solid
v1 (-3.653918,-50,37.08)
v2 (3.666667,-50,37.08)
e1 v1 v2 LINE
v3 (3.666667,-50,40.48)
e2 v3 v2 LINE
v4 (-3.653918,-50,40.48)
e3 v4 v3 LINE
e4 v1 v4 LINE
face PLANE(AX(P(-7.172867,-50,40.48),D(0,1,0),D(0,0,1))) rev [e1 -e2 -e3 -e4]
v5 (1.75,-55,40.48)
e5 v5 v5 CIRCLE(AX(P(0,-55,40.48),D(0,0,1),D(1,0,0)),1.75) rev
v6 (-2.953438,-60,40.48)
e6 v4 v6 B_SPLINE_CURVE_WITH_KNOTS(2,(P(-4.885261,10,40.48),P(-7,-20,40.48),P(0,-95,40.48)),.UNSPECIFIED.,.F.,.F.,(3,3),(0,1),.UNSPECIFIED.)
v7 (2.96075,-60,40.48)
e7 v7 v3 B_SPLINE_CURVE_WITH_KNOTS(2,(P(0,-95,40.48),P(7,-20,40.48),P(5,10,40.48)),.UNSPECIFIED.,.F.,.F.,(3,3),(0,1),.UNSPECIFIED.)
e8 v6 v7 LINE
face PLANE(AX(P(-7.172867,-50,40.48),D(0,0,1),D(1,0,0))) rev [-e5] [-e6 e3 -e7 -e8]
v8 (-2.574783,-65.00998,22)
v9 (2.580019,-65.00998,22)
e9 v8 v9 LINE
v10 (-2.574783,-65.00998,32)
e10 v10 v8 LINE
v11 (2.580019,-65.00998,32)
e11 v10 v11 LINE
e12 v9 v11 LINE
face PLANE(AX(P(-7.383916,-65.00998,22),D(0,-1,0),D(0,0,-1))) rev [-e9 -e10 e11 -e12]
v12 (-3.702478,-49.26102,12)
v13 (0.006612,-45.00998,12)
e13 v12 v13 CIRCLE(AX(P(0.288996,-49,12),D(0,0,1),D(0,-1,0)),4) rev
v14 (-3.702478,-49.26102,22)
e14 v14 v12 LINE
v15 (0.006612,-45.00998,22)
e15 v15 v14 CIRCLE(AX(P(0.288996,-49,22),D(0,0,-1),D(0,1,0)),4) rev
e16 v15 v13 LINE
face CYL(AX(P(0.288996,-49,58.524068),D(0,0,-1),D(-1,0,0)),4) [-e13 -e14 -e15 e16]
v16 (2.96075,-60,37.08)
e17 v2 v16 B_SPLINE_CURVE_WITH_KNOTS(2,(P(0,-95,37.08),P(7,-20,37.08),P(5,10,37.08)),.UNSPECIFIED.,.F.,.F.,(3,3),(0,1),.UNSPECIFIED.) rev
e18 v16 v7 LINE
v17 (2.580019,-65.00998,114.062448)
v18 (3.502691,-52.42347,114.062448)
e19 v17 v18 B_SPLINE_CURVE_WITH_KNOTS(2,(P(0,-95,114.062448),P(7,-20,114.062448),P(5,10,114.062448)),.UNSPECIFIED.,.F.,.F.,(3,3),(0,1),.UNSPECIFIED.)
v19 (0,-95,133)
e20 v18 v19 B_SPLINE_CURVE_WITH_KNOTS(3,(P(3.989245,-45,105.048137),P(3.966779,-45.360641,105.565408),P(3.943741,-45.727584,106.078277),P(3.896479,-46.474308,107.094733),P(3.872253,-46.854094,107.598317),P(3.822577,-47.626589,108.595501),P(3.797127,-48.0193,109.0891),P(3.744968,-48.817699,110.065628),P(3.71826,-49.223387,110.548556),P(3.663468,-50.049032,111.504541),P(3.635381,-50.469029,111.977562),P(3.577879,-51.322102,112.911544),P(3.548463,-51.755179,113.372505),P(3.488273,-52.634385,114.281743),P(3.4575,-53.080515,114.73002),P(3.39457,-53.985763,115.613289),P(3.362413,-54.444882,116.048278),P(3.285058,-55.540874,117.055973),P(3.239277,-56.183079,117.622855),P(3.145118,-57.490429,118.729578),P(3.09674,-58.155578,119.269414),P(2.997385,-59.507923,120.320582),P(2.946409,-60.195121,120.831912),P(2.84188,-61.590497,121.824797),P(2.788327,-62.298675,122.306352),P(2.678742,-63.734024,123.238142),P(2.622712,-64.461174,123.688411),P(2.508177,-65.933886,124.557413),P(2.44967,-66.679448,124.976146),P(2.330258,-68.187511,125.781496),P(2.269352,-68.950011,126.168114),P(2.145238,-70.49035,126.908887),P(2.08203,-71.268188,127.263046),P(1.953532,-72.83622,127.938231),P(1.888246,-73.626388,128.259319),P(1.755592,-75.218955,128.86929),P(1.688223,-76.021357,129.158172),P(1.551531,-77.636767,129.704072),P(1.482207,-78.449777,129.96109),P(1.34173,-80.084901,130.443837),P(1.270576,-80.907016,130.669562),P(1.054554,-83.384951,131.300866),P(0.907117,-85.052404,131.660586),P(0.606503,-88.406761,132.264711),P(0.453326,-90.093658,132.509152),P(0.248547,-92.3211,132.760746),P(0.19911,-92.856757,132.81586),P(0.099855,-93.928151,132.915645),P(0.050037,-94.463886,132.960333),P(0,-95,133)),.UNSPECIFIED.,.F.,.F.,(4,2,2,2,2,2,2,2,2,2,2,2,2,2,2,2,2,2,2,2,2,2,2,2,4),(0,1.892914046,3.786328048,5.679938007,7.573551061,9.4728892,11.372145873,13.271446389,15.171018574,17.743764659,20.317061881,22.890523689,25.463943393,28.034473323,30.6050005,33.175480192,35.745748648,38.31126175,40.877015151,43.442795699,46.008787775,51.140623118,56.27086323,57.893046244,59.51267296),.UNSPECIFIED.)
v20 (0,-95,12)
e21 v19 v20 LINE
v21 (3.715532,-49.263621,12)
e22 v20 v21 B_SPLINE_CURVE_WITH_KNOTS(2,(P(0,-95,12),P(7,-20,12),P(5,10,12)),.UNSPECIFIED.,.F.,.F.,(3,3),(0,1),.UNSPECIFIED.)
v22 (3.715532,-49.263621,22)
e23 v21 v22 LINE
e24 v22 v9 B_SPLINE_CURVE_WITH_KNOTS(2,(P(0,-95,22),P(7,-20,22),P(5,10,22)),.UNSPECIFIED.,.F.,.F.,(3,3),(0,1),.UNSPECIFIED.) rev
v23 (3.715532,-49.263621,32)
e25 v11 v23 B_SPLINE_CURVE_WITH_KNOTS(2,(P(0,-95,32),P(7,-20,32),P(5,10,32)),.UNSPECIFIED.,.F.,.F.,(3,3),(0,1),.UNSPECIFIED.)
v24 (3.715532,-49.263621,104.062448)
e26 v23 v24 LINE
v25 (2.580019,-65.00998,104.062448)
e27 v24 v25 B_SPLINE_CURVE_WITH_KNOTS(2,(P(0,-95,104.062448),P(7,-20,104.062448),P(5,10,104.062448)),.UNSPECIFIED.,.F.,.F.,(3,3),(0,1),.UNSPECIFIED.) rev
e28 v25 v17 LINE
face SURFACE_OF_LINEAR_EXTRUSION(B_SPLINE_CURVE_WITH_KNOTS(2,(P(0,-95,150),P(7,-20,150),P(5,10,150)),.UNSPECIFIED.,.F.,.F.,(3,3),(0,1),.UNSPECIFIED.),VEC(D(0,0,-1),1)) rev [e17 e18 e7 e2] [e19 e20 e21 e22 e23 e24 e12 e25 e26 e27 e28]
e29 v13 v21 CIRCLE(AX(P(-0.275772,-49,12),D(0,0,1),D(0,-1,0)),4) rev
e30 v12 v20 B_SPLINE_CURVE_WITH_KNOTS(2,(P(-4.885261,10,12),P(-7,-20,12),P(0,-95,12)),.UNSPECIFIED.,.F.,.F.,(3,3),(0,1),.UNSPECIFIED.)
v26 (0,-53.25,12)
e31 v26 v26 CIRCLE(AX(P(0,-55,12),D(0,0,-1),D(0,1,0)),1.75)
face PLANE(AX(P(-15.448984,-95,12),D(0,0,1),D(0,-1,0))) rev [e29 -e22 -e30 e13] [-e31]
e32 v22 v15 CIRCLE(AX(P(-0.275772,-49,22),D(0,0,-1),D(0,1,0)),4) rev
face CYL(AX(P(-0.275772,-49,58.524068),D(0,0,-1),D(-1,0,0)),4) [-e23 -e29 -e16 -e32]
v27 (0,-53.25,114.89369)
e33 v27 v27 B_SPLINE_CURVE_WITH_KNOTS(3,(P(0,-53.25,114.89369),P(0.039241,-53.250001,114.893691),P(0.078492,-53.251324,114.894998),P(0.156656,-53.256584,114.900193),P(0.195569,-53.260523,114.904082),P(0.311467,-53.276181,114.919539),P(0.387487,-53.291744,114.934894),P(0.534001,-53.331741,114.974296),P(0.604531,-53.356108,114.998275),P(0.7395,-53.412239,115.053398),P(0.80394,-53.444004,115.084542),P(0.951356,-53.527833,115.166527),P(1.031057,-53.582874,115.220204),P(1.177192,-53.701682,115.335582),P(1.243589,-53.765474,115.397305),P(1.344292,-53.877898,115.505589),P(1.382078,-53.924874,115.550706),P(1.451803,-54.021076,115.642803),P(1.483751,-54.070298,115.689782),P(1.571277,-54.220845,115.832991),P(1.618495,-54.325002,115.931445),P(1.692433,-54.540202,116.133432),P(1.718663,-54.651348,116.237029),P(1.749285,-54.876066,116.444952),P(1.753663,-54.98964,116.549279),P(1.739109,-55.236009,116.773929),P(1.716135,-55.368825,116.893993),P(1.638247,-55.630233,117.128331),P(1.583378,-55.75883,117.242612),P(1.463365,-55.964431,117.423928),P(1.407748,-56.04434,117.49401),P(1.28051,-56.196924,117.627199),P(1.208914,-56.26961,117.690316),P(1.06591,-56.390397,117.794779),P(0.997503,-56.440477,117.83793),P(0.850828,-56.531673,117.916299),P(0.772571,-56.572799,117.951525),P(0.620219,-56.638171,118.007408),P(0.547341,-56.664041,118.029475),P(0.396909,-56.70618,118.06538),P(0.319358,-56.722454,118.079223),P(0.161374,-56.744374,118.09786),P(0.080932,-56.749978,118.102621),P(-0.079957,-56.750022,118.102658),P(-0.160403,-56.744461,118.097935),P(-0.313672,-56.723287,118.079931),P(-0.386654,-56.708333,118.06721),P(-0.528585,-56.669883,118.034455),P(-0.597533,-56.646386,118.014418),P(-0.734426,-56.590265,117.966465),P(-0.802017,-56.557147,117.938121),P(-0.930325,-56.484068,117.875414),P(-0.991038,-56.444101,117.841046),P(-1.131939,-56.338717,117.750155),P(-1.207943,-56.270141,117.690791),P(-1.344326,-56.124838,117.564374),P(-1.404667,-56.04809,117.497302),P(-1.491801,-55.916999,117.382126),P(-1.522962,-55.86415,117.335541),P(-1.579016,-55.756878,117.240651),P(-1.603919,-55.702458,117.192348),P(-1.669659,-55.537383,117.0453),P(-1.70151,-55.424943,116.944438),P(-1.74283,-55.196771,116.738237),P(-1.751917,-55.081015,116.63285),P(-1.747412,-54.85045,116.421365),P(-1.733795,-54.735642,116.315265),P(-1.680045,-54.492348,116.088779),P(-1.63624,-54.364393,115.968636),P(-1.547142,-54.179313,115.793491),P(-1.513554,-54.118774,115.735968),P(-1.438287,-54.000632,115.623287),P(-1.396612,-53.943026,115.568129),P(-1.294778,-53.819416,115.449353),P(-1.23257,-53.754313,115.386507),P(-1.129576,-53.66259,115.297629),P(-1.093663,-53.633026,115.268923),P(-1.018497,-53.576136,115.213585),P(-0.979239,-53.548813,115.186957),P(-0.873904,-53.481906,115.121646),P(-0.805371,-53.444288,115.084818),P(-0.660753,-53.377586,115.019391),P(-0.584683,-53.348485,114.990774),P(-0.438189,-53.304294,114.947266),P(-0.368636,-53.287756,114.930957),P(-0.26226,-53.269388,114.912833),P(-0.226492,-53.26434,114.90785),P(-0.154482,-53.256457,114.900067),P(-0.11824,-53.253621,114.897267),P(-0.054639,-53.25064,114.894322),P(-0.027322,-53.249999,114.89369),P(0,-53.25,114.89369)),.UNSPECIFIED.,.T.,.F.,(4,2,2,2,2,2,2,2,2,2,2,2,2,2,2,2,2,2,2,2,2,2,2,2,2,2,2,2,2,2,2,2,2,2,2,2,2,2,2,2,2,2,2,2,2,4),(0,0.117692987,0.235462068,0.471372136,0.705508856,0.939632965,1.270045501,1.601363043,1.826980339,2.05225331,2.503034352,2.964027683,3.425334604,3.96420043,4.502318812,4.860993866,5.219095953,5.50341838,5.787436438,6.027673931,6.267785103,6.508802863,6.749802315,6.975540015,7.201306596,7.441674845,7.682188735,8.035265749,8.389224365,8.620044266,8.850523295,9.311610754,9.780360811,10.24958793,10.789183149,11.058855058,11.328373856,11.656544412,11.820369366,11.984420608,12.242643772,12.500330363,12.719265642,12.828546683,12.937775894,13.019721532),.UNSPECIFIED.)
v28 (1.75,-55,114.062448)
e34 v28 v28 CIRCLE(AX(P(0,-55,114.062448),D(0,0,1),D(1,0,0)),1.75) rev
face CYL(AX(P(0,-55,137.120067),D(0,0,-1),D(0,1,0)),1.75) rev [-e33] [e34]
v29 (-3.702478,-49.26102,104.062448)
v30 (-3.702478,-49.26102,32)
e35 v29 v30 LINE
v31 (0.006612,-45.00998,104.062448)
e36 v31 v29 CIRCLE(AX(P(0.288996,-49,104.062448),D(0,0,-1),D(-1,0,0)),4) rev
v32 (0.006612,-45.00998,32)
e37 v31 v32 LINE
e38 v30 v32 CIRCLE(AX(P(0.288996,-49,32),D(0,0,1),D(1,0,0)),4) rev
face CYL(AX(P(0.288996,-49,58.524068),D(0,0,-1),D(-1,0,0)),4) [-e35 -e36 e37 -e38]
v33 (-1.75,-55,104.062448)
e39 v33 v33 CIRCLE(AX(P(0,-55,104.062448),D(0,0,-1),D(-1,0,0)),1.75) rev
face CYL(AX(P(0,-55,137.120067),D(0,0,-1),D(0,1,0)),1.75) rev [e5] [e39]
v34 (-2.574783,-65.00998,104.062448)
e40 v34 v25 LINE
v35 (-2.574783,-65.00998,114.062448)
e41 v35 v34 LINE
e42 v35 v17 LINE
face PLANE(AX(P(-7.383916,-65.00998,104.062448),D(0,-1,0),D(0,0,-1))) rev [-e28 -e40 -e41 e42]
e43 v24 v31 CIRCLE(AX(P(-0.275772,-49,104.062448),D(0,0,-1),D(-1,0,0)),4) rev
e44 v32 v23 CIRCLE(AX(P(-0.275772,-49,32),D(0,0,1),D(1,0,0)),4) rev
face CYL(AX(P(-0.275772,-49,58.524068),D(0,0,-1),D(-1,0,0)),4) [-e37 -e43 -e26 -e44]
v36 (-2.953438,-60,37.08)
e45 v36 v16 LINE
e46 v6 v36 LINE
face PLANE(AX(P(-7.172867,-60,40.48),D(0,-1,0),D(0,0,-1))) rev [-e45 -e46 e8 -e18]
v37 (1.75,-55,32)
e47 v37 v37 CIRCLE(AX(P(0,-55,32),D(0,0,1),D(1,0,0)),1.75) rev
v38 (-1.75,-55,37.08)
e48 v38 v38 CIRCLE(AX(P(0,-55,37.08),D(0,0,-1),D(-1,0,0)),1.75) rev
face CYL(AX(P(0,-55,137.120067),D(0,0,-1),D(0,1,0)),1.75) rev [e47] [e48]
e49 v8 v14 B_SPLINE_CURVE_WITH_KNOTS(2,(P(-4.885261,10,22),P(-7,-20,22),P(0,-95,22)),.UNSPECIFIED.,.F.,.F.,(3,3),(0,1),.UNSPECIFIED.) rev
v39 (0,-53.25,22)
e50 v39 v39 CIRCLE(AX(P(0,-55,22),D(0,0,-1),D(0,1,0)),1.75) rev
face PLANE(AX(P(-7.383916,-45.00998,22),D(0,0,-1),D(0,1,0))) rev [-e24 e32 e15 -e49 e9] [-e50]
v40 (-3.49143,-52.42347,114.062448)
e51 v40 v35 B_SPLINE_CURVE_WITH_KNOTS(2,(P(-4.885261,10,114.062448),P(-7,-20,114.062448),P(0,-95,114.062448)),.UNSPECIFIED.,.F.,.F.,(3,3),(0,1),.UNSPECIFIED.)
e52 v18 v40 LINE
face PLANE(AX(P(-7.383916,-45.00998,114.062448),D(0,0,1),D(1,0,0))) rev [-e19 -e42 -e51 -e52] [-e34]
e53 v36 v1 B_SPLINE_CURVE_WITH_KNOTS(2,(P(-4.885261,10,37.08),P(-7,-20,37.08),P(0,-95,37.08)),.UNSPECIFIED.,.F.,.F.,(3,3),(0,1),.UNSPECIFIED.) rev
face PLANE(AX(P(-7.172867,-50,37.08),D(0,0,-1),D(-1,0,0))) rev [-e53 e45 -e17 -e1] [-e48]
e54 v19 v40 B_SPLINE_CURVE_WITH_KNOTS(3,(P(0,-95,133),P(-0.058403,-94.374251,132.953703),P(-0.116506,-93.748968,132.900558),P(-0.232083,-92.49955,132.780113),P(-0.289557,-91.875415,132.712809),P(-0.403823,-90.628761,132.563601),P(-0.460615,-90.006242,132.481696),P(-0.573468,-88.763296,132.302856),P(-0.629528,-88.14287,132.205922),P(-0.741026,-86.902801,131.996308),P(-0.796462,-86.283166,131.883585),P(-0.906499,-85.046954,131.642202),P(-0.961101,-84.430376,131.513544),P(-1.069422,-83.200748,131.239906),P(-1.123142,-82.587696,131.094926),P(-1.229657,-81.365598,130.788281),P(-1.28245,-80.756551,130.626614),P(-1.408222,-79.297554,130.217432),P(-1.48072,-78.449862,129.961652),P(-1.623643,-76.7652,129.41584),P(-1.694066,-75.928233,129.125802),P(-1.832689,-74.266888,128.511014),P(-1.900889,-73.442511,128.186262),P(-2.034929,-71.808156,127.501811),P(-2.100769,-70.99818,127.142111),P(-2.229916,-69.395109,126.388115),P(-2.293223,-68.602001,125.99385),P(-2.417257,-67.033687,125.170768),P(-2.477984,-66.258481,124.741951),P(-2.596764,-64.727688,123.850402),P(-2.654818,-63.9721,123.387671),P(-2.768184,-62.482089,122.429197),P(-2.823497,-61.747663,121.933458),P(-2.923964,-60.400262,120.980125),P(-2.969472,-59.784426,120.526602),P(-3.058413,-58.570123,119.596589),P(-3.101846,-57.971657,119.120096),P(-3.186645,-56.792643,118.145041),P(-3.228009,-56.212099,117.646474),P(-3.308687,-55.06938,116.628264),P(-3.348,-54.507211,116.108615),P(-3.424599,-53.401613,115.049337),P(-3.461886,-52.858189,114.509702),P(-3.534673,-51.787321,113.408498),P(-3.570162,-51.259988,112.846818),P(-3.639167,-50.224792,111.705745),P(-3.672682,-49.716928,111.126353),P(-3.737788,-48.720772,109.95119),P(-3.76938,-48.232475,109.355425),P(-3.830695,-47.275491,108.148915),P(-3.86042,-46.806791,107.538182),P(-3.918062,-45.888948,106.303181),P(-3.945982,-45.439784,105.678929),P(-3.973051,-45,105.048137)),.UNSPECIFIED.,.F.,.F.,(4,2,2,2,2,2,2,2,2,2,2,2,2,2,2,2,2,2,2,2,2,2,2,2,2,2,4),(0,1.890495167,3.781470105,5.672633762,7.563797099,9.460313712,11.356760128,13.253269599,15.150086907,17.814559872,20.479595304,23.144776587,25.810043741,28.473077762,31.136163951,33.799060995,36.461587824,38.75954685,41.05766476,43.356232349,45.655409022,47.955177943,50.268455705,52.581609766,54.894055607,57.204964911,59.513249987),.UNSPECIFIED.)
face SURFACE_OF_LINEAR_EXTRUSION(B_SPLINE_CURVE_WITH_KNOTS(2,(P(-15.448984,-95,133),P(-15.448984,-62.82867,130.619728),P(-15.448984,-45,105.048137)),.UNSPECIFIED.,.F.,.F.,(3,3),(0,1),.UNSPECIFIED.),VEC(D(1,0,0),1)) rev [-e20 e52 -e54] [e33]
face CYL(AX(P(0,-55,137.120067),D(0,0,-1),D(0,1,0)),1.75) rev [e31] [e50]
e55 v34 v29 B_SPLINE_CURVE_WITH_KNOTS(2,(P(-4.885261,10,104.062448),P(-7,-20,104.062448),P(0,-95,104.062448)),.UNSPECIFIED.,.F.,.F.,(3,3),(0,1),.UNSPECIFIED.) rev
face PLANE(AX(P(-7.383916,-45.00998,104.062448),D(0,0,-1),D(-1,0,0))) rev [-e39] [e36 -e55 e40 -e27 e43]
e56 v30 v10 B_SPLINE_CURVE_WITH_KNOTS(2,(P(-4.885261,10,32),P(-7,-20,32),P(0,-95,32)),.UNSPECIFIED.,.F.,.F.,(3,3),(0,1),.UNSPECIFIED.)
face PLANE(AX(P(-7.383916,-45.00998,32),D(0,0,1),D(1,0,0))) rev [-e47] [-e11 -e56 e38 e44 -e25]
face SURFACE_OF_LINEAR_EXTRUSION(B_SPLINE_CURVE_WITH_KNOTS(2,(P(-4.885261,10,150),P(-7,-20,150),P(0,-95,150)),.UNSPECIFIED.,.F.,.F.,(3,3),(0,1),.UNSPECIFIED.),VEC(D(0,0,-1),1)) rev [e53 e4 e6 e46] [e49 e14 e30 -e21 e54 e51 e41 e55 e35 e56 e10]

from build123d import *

# Parameters (mm, degrees)
SKETCH_2_R               = 3.25
EXTRUDE_1_DEPTH          = 150
CUT_EXTRUDE_START        = -5.375917787
CUT_EXTRUDE_1_DEPTH      = 10.820362331
CUT_EXTRUDE_2_DEPTH      = 178.636263262
CUT_EXTRUDE_2_DEPTH_BACK = 178.636263262
SKETCH_5_R               = 1.75
CUT_EXTRUDE_3_DEPTH      = 154.889291752
FILLET_1_R               = 4
CUT_EXTRUDE_4_DEPTH      = 164.486604715
CUT_EXTRUDE_4_DEPTH_BACK = 164.486604715
SKETCH_8_W               = 10
SKETCH_8_H               = 20
CUT_EXTRUDE_5_DEPTH      = 164.486604715
CUT_EXTRUDE_5_DEPTH_BACK = 164.486604715
SKETCH_9_W               = 3.4
SKETCH_9_H               = 10


# Read off the part's stored shape, not the designer's step: 除料-伸長1
with BuildPart() as part:
    # 草圖2 → 填料-伸長1 (new body)
    with BuildSketch(Plane.XY):
        with BuildLine():
            add(Edge.make_bspline(
                [(-4.885261194, 10), (0, 40), (5, 10)],
                knots=[0, 0, 0, 1, 1, 1], degree=2))
            add(Edge.make_bspline(
                [(5, 10), (7, -20), (0, -95)],
                knots=[0, 0, 0, 1, 1, 1], degree=2))
            add(Edge.make_bspline(
                [(-4.885261194, 10), (-7, -20), (0, -95)],
                knots=[0, 0, 0, 1, 1, 1], degree=2))
        make_face()
        with Locations((0, 5)):
            Circle(SKETCH_2_R, mode=Mode.SUBTRACT)
        with Locations((0, -15)):
            Circle(SKETCH_2_R, mode=Mode.SUBTRACT)
    extrude(amount=EXTRUDE_1_DEPTH)

    # 除料-伸長1 outline → 除料-伸長1 (cut)
    with BuildSketch(Plane(origin=(0, 0, 0), x_dir=(0, 0, -1), z_dir=(1, 0, 0)).offset(CUT_EXTRUDE_START)):
        with BuildLine():
            Line((-150, 25), (-150, -80.493578612))
            add(Edge.make_bspline(
                [(-45.078048967, 25), (-92.099367892, 5.715924734), (-132.413995221, -32.343019704), (-150, -80.493578612)],
                knots=[0, 0, 0, 0, 1, 1, 1, 1], degree=3))
            Line((-45.078048967, 25), (-150, 25))
        make_face()
    extrude(amount=CUT_EXTRUDE_1_DEPTH, mode=Mode.SUBTRACT)

    # 草圖4 → 除料-伸長2 (cut, two sides: drawn at the far end of the back side and taken through both)
    with BuildSketch(Plane(origin=(0, 0, 0), x_dir=(0, 0, -1), z_dir=(1, 0, 0)).offset(-CUT_EXTRUDE_2_DEPTH_BACK)):
        with BuildLine():
            Line((-12, -95), (-12, -45))
            Line((-12, -45), (-105.048136882, -45))
            add(Edge.make_bspline(
                [(-105.048136882, -45), (-130.619727744, -62.828669631), (-133, -95)],
                knots=[0, 0, 0, 1, 1, 1], degree=2))
            Line((-133, -95), (-202.799866115, -110.736264896))
            Line((-202.799866115, -110.736264896), (-206.293444292, 4.551814945))
            Line((-206.293444292, 4.551814945), (-122.032968562, 45.937279504))
            Line((-122.032968562, 45.937279504), (-2.049657297, 49.573137421))
            Line((-2.049657297, 49.573137421), (77.223861612, 25.244547225))
            Line((77.223861612, 25.244547225), (93.885542148, -58.870065807))
            Line((93.885542148, -58.870065807), (27.807345311, -110.736264896))
            Line((27.807345311, -110.736264896), (-12, -95))
        make_face()
    extrude(amount=CUT_EXTRUDE_2_DEPTH + CUT_EXTRUDE_2_DEPTH_BACK, mode=Mode.SUBTRACT)

    # 草圖5 → 除料-伸長3 (cut, through all)
    with BuildSketch(Plane(origin=(0, 0, 12), x_dir=(-1, 0, 0), z_dir=(0, 0, -1))):
        with Locations(Location((0, -55, 0), (0, 0, 90))):
            Circle(SKETCH_5_R)
    extrude(amount=-CUT_EXTRUDE_3_DEPTH, mode=Mode.SUBTRACT)

    # 圓角1
    # the kernel refuses this fillet: 4 mm, written as the material it takes off along each edge
    with BuildSketch(Plane(origin=(-3.97305147, -45, 115.722141015), x_dir=(0.06337202796258917, -0.9979899729315466, 0), z_dir=(0, 0, -1))) as fillet_1_piece_1:
        with BuildLine():
            CenterArc((4.262054506, -3.99999288), FILLET_1_R, 89.891895008, 93.74148946)
            Line((0.270094614, -4.253480992), (0, 0))
            ThreePointArc((0, 0), (2.134800854, 0.002041927), (4.269601653, 0))
        make_face()
    extrude(amount=114.396145149, mode=Mode.SUBTRACT)
    with BuildSketch(Plane(origin=(3.989244513, -45, 115.729130337), x_dir=(-0.06406540579517839, -0.9979457018196427, 0), z_dir=(0, 0, -1))) as fillet_1_piece_2:
        with BuildLine():
            CenterArc((4.265022816, 3.999993202), FILLET_1_R, 176.326807013, 93.77882592)
            Line((0.273240009, 4.256254825), (0, 0))
            ThreePointArc((0, 0), (2.136198717, -0.001996553), (4.272397382, 0))
        make_face()
    extrude(amount=114.410123792, mode=Mode.SUBTRACT)

    # 草圖8 → 除料-伸長4 (cut, two sides: drawn at the far end of the back side and taken through both)
    with BuildSketch(Plane(origin=(0, 0, 0), x_dir=(0, 0, -1), z_dir=(1, 0, 0)).offset(-CUT_EXTRUDE_4_DEPTH_BACK)):
        with Locations((-27, -55.009980051)):
            Rectangle(SKETCH_8_W, SKETCH_8_H)
        with Locations((-109.062447802, -55.009980051)):
            Rectangle(SKETCH_8_W, SKETCH_8_H)
    extrude(amount=CUT_EXTRUDE_4_DEPTH + CUT_EXTRUDE_4_DEPTH_BACK, mode=Mode.SUBTRACT)

    # 草圖9 → 除料-伸長5 (cut, two sides: drawn at the far end of the back side and taken through both)
    with BuildSketch(Plane(origin=(0, 0, 0), x_dir=(0, 0, -1), z_dir=(1, 0, 0)).offset(-CUT_EXTRUDE_5_DEPTH_BACK)):
        with Locations((-38.78, -55)):
            Rectangle(SKETCH_9_W, SKETCH_9_H)
    extrude(amount=CUT_EXTRUDE_5_DEPTH + CUT_EXTRUDE_5_DEPTH_BACK, mode=Mode.SUBTRACT)


solid = part.part
